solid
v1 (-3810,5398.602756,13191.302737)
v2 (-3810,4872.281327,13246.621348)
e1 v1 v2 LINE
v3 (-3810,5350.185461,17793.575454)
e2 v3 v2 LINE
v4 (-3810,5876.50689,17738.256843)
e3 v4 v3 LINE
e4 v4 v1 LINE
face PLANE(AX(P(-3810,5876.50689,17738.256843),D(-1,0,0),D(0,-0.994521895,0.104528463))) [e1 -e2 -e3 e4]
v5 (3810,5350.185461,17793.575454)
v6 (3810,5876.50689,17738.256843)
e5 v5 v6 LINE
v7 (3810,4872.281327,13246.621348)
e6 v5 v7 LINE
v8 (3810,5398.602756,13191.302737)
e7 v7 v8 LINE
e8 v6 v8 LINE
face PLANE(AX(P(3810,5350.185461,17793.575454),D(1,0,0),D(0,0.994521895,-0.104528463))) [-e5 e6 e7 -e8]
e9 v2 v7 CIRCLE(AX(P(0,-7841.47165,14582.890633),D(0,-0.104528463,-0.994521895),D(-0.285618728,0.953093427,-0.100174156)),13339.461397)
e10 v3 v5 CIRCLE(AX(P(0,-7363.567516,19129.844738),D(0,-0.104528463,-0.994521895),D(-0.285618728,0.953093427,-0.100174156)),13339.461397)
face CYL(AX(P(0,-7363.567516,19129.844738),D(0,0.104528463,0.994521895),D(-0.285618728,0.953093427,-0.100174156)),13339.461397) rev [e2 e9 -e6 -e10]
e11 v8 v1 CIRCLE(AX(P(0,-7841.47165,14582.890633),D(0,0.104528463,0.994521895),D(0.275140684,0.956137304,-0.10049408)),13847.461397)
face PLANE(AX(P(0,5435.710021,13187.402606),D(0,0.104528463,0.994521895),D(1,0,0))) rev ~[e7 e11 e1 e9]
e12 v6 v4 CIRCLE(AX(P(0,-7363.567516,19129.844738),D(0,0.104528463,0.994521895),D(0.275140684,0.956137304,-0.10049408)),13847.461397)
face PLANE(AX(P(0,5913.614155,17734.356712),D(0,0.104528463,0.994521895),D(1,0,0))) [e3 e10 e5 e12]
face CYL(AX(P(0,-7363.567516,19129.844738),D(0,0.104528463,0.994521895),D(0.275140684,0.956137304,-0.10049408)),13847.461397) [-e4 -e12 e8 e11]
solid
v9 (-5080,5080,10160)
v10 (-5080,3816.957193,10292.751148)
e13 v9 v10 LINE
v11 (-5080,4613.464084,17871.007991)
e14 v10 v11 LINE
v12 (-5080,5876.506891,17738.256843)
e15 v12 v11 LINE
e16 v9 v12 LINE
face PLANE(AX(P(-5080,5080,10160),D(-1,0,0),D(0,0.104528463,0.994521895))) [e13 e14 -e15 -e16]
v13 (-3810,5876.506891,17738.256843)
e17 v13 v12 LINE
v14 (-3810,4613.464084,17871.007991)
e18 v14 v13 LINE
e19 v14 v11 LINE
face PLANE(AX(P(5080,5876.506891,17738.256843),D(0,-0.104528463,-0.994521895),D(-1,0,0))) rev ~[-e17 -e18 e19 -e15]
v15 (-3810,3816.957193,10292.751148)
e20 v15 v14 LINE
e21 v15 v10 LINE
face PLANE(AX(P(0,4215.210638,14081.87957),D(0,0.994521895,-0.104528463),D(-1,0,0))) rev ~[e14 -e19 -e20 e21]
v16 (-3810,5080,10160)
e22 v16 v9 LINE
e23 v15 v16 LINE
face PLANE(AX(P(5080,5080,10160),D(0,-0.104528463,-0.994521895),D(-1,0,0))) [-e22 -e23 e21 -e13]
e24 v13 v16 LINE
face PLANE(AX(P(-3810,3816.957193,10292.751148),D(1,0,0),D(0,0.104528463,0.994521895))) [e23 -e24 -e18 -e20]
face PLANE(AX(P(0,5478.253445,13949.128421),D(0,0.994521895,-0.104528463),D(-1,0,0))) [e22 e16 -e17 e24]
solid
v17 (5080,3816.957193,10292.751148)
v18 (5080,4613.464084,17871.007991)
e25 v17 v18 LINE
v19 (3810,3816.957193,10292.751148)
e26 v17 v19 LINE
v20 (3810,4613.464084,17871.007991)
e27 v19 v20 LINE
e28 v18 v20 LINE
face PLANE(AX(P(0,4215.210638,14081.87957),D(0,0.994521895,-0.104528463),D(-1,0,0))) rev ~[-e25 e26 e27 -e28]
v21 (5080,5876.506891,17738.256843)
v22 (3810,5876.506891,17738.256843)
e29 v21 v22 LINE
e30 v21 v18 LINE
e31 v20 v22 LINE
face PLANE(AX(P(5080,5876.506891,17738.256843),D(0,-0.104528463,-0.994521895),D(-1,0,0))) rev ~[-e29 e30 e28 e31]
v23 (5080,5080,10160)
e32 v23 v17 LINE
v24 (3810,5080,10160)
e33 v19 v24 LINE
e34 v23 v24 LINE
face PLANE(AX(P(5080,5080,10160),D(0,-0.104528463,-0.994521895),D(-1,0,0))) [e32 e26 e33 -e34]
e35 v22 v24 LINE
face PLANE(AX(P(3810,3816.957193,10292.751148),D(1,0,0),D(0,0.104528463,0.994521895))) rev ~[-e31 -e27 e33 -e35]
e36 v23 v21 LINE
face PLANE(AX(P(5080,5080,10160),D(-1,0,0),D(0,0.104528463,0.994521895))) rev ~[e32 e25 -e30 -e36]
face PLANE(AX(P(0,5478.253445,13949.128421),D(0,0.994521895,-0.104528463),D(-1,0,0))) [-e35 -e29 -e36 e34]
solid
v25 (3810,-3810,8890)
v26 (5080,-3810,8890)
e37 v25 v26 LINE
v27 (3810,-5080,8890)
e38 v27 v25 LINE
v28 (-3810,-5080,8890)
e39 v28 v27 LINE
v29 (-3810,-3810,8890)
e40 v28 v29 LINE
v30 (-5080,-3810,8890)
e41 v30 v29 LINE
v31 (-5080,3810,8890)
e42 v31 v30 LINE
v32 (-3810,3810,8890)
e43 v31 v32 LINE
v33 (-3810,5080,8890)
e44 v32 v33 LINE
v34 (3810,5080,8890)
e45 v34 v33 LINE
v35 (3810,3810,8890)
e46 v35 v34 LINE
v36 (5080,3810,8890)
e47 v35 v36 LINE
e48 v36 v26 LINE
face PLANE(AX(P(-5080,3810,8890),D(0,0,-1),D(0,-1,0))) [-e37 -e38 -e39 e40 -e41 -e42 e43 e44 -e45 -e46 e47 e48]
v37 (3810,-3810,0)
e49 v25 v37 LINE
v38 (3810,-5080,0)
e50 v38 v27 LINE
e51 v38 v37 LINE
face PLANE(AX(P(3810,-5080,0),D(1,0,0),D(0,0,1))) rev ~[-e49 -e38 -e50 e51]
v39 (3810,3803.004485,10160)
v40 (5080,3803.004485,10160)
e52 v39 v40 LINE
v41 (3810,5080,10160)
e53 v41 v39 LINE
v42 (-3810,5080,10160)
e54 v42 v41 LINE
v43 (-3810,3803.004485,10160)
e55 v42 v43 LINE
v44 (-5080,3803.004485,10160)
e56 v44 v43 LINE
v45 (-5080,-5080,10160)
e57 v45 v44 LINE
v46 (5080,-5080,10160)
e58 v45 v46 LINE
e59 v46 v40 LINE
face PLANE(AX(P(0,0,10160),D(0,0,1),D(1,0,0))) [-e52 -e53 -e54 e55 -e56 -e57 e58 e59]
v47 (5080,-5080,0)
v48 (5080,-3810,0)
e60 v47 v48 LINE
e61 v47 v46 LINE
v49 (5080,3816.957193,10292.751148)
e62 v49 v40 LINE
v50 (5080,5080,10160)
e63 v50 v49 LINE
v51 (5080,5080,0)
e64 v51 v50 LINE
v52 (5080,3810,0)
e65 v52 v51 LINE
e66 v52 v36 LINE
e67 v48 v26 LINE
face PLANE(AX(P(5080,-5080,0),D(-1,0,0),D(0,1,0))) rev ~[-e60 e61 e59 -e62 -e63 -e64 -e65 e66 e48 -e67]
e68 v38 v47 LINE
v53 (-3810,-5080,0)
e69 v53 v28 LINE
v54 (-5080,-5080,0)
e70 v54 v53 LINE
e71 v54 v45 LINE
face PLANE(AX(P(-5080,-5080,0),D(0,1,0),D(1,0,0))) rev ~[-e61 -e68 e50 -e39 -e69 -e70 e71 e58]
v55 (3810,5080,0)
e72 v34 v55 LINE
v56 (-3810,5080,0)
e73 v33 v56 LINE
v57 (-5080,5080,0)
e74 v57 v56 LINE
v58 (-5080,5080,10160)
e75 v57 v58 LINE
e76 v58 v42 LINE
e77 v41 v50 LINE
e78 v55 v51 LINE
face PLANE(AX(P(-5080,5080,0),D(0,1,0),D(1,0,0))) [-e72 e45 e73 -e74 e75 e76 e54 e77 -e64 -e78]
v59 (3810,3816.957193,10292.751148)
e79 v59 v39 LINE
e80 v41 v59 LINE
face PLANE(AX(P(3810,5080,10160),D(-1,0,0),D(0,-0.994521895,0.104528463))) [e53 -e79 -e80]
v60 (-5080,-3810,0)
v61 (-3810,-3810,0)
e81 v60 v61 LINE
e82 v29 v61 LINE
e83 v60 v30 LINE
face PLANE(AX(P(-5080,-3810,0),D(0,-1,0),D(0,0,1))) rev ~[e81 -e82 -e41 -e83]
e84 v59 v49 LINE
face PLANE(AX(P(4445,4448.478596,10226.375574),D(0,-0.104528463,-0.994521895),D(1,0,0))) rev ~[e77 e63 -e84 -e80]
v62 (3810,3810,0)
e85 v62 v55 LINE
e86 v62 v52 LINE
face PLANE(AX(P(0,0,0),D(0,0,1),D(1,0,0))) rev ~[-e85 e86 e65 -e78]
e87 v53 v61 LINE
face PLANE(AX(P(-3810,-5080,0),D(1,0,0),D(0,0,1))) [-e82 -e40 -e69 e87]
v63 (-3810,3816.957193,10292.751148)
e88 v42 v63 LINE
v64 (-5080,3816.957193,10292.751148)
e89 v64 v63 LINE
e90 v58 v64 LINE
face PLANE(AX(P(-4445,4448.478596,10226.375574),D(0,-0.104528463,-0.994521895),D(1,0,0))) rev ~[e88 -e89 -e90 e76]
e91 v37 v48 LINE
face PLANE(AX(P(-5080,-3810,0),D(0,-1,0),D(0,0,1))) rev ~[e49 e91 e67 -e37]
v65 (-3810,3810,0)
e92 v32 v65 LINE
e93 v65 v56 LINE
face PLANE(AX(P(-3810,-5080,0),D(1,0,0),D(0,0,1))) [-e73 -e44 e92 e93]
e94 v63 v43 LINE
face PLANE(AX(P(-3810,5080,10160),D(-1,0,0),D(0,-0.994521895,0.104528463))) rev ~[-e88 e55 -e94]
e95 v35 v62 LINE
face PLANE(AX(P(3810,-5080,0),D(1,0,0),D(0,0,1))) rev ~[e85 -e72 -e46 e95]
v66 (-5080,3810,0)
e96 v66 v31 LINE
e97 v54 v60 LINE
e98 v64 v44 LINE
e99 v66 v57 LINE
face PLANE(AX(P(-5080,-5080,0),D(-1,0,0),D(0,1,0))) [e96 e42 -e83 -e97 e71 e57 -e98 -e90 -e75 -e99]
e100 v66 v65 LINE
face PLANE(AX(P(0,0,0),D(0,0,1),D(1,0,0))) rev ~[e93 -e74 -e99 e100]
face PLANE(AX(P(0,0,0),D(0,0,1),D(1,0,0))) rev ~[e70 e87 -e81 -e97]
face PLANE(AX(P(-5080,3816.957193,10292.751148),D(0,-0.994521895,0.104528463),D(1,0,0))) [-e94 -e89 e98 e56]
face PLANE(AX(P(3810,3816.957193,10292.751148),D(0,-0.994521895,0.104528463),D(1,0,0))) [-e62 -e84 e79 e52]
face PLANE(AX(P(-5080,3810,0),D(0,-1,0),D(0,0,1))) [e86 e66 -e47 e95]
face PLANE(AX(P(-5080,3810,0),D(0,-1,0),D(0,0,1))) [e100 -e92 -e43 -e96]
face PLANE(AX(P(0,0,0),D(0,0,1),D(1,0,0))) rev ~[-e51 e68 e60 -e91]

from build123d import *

# Parameters (mm, degrees)
F0_W      = 10160
F0_H      = 10160
F1_DEPTH  = 10160
F2_W      = 7620
F2_H      = 8890
F3_DEPTH  = 12979.4
F4_W      = 7620
F4_H      = 8890
F5_DEPTH  = 15138.4
F10_W     = 10160
F10_H     = 7620
F11_DEPTH = 1270
F12_W     = 7620
F12_H     = 7620
F13_DEPTH = 5130.8
F15_W     = 1270
F15_H     = 1270
F16_DEPTH = 170.18
F14_W     = 1270
F14_H     = 1270
F17_DEPTH = 208.28
F19_DEPTH = 4572


with BuildPart() as f1:
    # F0 (on Top) → F1 (new body)
    with BuildSketch(Plane.XY):
        Rectangle(F0_W, F0_H)
    extrude(amount=F1_DEPTH)

    # F2 (on face) → F3 (cut)
    with BuildSketch(Plane.XZ.offset(5080)):
        with Locations((0, 4445)):
            Rectangle(F2_W, F2_H)
    extrude(amount=-F3_DEPTH, mode=Mode.SUBTRACT)

    # F4 (on face) → F5 (cut)
    with BuildSketch(Plane(origin=(-5080, 0, 0), x_dir=(0, -1, 0), z_dir=(-1, 0, 0))):
        with Locations((0, 4445)):
            Rectangle(F4_W, F4_H)
    extrude(amount=-F5_DEPTH, mode=Mode.SUBTRACT)

    # F15 (on face) → F16 (join)
    with BuildSketch(Plane(origin=(0, 1111.6964834904, 10577.0855064048), x_dir=(1, 0, 0), z_dir=(0, -0.1045284633, -0.9945218954))):
        with Locations((4445, -3355.1620416715)):
            Rectangle(F15_W, F15_H)
    extrude(amount=F16_DEPTH)

    # F14 (on face) → F17 (join)
    with BuildSketch(Plane(origin=(0, 1111.6964834904, 10577.0855064048), x_dir=(1, 0, 0), z_dir=(0, -0.1045284633, -0.9945218954))):
        with Locations((-4445, -3355.1620416715)):
            Rectangle(F14_W, F14_H)
    extrude(amount=F17_DEPTH)


with BuildPart() as f11:
    # F10 (on face) → F11 (new body)
    with BuildSketch(Plane(origin=(0, 3968.3035165096, -417.0855064048), x_dir=(-1, 0, 0), z_dir=(0, 0.9945218954, -0.1045284633))):
        with Locations((0, 14445.3470503413)):
            Rectangle(F10_W, F10_H)
    extrude(amount=-F11_DEPTH)

    # F12 (on face) → F13 (cut)
    with BuildSketch(Plane(origin=(0, 2705.2607093919, -284.3343580549), x_dir=(1, 0, 0), z_dir=(0, -0.9945218954, 0.1045284633))):
        with Locations((0, 14445.3470503413)):
            Rectangle(F12_W, F12_H)
    extrude(amount=-F13_DEPTH, mode=Mode.SUBTRACT)


with BuildPart() as f19:
    # F18 (on face) → F19 (new body)
    with BuildSketch(Plane(origin=(0, 1908.2033735899, 18155.3423491111), x_dir=(1, 0, 0), z_dir=(0, 0.1045284633, 0.9945218954))):
        with BuildLine():
            Line((3810, 3460.9414873997), (3810, 3990.1620416715))
            ThreePointArc((3810, 3990.1620416715), (0, 4524.6190016034), (-3810, 3990.1620416715))
            Line((-3810, 3990.1620416715), (-3810, 3460.9414873997))
            ThreePointArc((-3810, 3460.9414873997), (0, 4016.6190016034), (3810, 3460.9414873997))
        make_face()
    extrude(amount=-F19_DEPTH)


solid = Compound([f1.part, f11.part, f19.part])
